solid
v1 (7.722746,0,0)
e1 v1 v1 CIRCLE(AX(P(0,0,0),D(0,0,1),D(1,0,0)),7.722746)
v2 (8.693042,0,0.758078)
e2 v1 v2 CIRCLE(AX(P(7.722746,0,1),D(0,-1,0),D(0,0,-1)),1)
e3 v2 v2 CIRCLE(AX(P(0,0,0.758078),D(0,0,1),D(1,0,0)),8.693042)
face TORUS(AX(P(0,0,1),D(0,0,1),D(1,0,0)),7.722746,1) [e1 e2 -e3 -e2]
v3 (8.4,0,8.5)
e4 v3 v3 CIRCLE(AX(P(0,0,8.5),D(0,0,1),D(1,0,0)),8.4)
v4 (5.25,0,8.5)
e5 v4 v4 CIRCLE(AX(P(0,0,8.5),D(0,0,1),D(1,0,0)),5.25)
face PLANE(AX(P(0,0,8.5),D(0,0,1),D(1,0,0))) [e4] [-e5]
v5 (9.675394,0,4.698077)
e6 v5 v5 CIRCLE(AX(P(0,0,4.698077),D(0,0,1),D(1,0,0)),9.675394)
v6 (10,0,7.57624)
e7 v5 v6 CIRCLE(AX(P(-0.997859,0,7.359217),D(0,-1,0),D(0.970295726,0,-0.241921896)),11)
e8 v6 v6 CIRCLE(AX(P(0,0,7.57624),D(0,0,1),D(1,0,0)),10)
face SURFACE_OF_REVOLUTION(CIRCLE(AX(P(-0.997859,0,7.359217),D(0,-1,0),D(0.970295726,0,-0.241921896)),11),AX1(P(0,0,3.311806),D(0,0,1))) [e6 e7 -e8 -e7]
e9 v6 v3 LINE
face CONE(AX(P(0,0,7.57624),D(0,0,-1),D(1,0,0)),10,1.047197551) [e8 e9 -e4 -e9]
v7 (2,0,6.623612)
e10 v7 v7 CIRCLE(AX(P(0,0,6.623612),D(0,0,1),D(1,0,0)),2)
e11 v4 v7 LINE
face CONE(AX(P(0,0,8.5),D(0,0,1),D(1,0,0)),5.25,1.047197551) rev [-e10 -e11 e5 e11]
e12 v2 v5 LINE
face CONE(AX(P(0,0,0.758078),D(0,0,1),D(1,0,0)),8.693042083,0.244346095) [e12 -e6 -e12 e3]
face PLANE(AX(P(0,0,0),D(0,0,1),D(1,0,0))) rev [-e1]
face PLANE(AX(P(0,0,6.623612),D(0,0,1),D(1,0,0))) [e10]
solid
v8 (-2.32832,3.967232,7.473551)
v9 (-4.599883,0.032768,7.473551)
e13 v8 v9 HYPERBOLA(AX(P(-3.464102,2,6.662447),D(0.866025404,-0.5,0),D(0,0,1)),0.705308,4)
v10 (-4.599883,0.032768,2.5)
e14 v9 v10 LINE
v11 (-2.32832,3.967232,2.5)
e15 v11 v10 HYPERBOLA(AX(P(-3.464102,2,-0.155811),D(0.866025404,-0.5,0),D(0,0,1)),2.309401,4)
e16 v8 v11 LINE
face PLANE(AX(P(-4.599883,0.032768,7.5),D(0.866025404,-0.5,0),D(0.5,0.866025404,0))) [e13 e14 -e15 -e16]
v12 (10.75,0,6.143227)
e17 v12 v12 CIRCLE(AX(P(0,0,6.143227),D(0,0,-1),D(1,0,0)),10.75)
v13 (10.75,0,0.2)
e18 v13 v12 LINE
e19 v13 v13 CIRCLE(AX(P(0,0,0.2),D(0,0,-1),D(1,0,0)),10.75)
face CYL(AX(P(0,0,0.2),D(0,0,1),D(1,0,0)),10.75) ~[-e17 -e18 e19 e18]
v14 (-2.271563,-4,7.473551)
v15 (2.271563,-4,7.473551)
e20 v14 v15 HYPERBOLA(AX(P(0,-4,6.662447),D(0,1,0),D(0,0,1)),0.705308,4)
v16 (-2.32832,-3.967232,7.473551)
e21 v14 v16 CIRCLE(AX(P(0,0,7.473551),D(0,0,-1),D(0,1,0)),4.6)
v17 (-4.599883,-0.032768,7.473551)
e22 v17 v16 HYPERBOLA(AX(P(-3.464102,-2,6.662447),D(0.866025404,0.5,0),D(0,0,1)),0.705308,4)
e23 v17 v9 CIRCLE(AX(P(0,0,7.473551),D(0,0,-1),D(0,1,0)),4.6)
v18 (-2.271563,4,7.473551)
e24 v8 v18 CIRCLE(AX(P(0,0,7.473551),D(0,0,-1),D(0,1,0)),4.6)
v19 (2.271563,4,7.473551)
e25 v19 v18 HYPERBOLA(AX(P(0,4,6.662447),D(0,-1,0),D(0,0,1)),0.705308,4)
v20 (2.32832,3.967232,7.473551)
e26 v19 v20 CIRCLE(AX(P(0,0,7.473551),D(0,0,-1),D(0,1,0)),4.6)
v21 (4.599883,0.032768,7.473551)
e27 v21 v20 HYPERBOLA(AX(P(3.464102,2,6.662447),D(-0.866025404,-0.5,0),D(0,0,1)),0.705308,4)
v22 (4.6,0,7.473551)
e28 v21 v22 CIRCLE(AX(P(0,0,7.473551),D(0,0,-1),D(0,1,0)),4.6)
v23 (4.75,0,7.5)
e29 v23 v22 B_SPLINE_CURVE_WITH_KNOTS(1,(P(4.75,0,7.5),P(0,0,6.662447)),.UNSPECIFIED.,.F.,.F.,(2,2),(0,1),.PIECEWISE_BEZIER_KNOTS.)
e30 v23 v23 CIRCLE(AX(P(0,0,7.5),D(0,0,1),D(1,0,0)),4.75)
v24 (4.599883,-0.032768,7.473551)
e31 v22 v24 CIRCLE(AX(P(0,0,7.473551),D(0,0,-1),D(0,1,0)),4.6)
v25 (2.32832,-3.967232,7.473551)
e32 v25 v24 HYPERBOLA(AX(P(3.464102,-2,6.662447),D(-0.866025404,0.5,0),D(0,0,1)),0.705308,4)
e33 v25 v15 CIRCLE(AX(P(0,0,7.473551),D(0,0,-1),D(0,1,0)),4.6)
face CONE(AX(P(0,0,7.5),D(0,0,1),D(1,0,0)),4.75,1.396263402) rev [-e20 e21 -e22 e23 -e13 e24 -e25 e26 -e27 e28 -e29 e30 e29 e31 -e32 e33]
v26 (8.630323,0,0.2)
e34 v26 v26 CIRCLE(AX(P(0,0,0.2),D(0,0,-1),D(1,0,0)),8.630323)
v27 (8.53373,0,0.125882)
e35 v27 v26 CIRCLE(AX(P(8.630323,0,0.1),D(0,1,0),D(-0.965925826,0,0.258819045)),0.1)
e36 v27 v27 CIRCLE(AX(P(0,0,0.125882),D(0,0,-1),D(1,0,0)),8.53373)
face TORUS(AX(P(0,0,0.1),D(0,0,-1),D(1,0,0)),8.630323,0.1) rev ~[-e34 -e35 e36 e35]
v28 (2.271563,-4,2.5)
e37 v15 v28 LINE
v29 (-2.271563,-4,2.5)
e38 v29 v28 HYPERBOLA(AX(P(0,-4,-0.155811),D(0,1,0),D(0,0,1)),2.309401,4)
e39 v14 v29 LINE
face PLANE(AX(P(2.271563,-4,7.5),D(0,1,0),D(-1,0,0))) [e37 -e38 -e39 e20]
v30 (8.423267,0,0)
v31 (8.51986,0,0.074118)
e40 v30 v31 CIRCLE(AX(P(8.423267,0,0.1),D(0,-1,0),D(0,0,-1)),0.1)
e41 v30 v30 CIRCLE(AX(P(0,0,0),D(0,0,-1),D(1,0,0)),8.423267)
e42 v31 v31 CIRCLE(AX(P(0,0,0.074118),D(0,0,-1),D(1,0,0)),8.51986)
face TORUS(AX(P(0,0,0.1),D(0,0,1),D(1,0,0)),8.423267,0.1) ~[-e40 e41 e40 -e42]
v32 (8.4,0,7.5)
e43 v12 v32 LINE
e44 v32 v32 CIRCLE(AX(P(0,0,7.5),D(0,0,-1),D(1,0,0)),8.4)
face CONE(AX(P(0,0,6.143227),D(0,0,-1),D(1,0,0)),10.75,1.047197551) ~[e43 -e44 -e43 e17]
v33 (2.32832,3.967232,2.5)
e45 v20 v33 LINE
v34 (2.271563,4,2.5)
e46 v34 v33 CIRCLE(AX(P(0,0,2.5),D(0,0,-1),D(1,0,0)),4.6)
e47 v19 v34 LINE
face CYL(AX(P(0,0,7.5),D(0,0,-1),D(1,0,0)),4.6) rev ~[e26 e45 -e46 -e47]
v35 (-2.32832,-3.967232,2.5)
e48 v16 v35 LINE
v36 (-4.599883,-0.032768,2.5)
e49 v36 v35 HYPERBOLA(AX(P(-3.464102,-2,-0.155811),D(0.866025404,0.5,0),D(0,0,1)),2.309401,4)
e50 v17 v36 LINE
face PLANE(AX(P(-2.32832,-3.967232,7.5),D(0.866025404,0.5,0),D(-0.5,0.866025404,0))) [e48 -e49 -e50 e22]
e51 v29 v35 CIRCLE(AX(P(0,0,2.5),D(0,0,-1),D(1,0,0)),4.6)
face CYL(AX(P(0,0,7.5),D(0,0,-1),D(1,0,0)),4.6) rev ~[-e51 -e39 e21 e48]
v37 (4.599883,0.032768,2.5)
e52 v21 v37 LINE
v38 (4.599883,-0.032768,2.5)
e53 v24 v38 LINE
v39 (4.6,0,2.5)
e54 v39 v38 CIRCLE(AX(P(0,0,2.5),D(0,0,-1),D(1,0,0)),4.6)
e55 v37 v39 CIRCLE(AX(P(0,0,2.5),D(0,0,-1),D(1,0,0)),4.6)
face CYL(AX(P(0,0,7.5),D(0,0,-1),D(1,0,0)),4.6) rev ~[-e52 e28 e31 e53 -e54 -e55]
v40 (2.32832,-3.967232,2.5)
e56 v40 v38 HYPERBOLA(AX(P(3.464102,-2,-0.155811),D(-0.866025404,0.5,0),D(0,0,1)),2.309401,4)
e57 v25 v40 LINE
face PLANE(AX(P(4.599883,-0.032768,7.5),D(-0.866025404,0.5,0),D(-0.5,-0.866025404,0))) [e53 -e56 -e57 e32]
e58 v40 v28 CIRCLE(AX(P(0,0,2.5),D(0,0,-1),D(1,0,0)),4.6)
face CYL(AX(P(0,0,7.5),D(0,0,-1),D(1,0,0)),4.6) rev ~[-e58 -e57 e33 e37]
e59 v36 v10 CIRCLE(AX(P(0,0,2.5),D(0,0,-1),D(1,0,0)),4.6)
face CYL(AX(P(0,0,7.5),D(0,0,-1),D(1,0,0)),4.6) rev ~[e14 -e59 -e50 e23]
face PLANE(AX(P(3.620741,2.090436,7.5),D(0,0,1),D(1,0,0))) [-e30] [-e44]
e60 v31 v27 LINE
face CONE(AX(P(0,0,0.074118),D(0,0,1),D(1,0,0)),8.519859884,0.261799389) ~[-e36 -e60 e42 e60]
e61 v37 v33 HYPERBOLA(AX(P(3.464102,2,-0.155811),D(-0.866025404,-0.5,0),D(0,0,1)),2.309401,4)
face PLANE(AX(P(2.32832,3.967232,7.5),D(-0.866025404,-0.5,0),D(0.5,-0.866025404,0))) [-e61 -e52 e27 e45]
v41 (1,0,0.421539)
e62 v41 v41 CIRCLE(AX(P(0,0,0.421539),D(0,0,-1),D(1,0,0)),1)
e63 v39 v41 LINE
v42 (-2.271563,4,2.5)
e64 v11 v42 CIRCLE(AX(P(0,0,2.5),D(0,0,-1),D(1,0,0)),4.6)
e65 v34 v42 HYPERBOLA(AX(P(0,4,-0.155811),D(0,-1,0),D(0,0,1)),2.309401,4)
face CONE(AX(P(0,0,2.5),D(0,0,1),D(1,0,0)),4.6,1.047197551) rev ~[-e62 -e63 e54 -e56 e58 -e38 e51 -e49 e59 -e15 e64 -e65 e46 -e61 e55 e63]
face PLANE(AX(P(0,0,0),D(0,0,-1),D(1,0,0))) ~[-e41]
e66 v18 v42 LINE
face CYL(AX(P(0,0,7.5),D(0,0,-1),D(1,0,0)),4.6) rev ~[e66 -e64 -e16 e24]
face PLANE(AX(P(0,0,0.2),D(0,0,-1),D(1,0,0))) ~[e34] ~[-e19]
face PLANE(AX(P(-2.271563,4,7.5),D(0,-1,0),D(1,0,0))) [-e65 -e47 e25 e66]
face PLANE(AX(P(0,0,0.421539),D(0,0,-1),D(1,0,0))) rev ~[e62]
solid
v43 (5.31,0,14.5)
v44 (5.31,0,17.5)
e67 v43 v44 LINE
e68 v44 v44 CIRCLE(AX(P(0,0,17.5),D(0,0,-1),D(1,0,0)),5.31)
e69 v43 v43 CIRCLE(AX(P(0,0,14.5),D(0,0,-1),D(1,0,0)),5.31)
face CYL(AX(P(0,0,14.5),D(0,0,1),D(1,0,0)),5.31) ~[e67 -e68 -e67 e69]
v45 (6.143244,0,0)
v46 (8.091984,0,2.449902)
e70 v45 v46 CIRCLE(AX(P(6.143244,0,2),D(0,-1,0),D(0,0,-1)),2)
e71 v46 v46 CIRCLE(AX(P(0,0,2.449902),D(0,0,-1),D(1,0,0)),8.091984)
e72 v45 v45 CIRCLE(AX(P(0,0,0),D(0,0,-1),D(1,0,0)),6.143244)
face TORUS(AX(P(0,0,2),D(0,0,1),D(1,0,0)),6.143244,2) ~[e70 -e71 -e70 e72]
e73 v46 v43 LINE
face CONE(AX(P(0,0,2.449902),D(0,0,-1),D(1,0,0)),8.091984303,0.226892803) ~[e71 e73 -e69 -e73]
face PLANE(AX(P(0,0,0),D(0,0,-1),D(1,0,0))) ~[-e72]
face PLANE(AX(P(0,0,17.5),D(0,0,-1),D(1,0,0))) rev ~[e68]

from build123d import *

# Parameters (mm, degrees)
F3_DEPTH = 7.5
F4_R     = 4.75


# Not quite as in the source:
# - an extrude ends at something that could not be found from the text; its depth is read off the source's solid
# - an extrude whose draft closes it to a point is written as a loft to that point


with BuildPart() as f1:
    # F0 (on Front) → F1 (revolve)
    with BuildSketch(Plane.XZ):
        with BuildLine():
            Line((8.4, 7.5), (4.6, 7.5))
            Line((4.6, 7.5), (4.6, 2.5))
            Line((4.6, 2.5), (1, 0.4215390309))
            Line((1, 0.4215390309), (0, 0.4215390309))
            Line((0, 0.4215390309), (0, 0))
            Line((0, 0), (8.4232673012, 0))
            ThreePointArc((8.4232673012, 0), (8.4841434441, 0.020664666), (8.5198598838, 0.0741180955))
            Line((8.5198598838, 0.0741180955), (8.5337299547, 0.1258819045))
            ThreePointArc((8.5337299547, 0.1258819045), (8.5694463944, 0.179335334), (8.6303225373, 0.2))
            Line((8.6303225373, 0.2), (10.75, 0.2))
            Line((10.75, 0.2), (10.75, 6.1432268674))
            Line((10.75, 6.1432268674), (8.4, 7.5))
        make_face()
    revolve(axis=Axis((0, 0, 0.2107695155), (0, 0, -1)))

    # F2 (on face) → F3 (join, through all)
    with BuildSketch(Plane.XY.offset(7.5)):
        with BuildLine():
            Line((2.328319946, 3.9672315573), (4.5998832843, 0.0327684427))
            ThreePointArc((4.5998832843, 0.0327684427), (3.9837168574, 2.3), (2.328319946, 3.9672315573))
        make_face()
        with BuildLine():
            ThreePointArc((2.2715633383, 4), (2.3, 3.9837168574), (2.328319946, 3.9672315573))
            Line((2.328319946, 3.9672315573), (2.3094010768, 4))
            Line((2.3094010768, 4), (2.2715633383, 4))
        make_face()
        with BuildLine():
            Line((-2.2715633383, 4), (2.2715633383, 4))
            ThreePointArc((2.2715633383, 4), (0, 4.6), (-2.2715633383, 4))
        make_face()
        with BuildLine():
            ThreePointArc((-2.328319946, 3.9672315573), (-2.3, 3.9837168574), (-2.2715633383, 4))
            Line((-2.2715633383, 4), (-2.3094010768, 4))
            Line((-2.3094010768, 4), (-2.328319946, 3.9672315573))
        make_face()
        with BuildLine():
            Line((-4.5998832843, 0.0327684427), (-2.328319946, 3.9672315573))
            ThreePointArc((-2.328319946, 3.9672315573), (-3.9837168574, 2.3), (-4.5998832843, 0.0327684427))
        make_face()
        with BuildLine():
            ThreePointArc((-4.5998832843, -0.0327684427), (-4.6, 0), (-4.5998832843, 0.0327684427))
            Line((-4.5998832843, 0.0327684427), (-4.6188021535, 0))
            Line((-4.6188021535, 0), (-4.5998832843, -0.0327684427))
        make_face()
        with BuildLine():
            ThreePointArc((-4.5998832843, -0.0327684427), (-3.9837168574, -2.3), (-2.328319946, -3.9672315573))
            Line((-2.328319946, -3.9672315573), (-4.5998832843, -0.0327684427))
        make_face()
        with BuildLine():
            Line((-2.3094010768, -4), (-2.2715633383, -4))
            ThreePointArc((-2.2715633383, -4), (-2.3, -3.9837168574), (-2.328319946, -3.9672315573))
            Line((-2.328319946, -3.9672315573), (-2.3094010768, -4))
        make_face()
        with BuildLine():
            ThreePointArc((-2.2715633383, -4), (0, -4.6), (2.2715633383, -4))
            Line((2.2715633383, -4), (-2.2715633383, -4))
        make_face()
        with BuildLine():
            Line((2.3094010768, -4), (2.328319946, -3.9672315573))
            ThreePointArc((2.328319946, -3.9672315573), (2.3, -3.9837168574), (2.2715633383, -4))
            Line((2.2715633383, -4), (2.3094010768, -4))
        make_face()
        with BuildLine():
            ThreePointArc((2.328319946, -3.9672315573), (3.9837168574, -2.3), (4.5998832843, -0.0327684427))
            Line((4.5998832843, -0.0327684427), (2.328319946, -3.9672315573))
        make_face()
        with BuildLine():
            ThreePointArc((4.5998832843, 0.0327684427), (4.599970821, 0.0163843253), (4.6, 0))
            ThreePointArc((4.6, 0), (4.599970821, -0.0163843253), (4.5998832843, -0.0327684427))
            Line((4.5998832843, -0.0327684427), (4.6188021535, 0))
            Line((4.6188021535, 0), (4.5998832843, 0.0327684427))
        make_face()
    extrude(amount=-F3_DEPTH)

    # F4 (on face) → F5 section 0
    with BuildSketch(Plane.XY.offset(7.5), mode=Mode.PRIVATE) as f5_s0:
        Circle(F4_R)
    loft([f5_s0.sketch, Vertex(0, 0, 6.6624468416)], ruled=True, mode=Mode.SUBTRACT)


with BuildPart() as f7:
    # F6 (on Front) → F7 (revolve)
    with BuildSketch(Plane.XZ):
        with BuildLine():
            Line((5.31, 17.5), (0, 17.5))
            Line((0, 17.5), (0, 0))
            Line((0, 0), (6.1432441735, 0))
            ThreePointArc((6.1432441735, 0), (7.7084604872, 0.7549707267), (8.0919843031, 2.4499021087))
            Line((8.0919843031, 2.4499021087), (5.31, 14.5))
            Line((5.31, 14.5), (5.31, 17.5))
        make_face()
    revolve(axis=Axis((0, 0, 8.75), (0, 0, -1)))


with BuildPart() as f9:
    # F8 (on Front) → F9 (revolve)
    with BuildSketch(Plane.XZ):
        with BuildLine():
            Line((0, 6.6236116251), (0, 0))
            Line((0, 0), (7.7227463564, 0))
            ThreePointArc((7.7227463564, 0), (8.3384078318, 0.2119892464), (8.6930420827, 0.7580781044))
            Line((8.6930420827, 0.7580781044), (9.6753940425, 4.6980766149))
            ThreePointArc((9.6753940425, 4.6980766149), (9.9328422492, 6.1264273905), (10, 7.5762395693))
            Line((10, 7.5762395693), (8.4, 8.5))
            Line((8.4, 8.5), (5.25, 8.5))
            Line((5.25, 8.5), (2, 6.6236116251))
            Line((2, 6.6236116251), (0, 6.6236116251))
        make_face()
    revolve(axis=Axis((0, 0, 3.3118058126), (0, 0, 1)))


solid = Compound([f1.part, f7.part, f9.part])
